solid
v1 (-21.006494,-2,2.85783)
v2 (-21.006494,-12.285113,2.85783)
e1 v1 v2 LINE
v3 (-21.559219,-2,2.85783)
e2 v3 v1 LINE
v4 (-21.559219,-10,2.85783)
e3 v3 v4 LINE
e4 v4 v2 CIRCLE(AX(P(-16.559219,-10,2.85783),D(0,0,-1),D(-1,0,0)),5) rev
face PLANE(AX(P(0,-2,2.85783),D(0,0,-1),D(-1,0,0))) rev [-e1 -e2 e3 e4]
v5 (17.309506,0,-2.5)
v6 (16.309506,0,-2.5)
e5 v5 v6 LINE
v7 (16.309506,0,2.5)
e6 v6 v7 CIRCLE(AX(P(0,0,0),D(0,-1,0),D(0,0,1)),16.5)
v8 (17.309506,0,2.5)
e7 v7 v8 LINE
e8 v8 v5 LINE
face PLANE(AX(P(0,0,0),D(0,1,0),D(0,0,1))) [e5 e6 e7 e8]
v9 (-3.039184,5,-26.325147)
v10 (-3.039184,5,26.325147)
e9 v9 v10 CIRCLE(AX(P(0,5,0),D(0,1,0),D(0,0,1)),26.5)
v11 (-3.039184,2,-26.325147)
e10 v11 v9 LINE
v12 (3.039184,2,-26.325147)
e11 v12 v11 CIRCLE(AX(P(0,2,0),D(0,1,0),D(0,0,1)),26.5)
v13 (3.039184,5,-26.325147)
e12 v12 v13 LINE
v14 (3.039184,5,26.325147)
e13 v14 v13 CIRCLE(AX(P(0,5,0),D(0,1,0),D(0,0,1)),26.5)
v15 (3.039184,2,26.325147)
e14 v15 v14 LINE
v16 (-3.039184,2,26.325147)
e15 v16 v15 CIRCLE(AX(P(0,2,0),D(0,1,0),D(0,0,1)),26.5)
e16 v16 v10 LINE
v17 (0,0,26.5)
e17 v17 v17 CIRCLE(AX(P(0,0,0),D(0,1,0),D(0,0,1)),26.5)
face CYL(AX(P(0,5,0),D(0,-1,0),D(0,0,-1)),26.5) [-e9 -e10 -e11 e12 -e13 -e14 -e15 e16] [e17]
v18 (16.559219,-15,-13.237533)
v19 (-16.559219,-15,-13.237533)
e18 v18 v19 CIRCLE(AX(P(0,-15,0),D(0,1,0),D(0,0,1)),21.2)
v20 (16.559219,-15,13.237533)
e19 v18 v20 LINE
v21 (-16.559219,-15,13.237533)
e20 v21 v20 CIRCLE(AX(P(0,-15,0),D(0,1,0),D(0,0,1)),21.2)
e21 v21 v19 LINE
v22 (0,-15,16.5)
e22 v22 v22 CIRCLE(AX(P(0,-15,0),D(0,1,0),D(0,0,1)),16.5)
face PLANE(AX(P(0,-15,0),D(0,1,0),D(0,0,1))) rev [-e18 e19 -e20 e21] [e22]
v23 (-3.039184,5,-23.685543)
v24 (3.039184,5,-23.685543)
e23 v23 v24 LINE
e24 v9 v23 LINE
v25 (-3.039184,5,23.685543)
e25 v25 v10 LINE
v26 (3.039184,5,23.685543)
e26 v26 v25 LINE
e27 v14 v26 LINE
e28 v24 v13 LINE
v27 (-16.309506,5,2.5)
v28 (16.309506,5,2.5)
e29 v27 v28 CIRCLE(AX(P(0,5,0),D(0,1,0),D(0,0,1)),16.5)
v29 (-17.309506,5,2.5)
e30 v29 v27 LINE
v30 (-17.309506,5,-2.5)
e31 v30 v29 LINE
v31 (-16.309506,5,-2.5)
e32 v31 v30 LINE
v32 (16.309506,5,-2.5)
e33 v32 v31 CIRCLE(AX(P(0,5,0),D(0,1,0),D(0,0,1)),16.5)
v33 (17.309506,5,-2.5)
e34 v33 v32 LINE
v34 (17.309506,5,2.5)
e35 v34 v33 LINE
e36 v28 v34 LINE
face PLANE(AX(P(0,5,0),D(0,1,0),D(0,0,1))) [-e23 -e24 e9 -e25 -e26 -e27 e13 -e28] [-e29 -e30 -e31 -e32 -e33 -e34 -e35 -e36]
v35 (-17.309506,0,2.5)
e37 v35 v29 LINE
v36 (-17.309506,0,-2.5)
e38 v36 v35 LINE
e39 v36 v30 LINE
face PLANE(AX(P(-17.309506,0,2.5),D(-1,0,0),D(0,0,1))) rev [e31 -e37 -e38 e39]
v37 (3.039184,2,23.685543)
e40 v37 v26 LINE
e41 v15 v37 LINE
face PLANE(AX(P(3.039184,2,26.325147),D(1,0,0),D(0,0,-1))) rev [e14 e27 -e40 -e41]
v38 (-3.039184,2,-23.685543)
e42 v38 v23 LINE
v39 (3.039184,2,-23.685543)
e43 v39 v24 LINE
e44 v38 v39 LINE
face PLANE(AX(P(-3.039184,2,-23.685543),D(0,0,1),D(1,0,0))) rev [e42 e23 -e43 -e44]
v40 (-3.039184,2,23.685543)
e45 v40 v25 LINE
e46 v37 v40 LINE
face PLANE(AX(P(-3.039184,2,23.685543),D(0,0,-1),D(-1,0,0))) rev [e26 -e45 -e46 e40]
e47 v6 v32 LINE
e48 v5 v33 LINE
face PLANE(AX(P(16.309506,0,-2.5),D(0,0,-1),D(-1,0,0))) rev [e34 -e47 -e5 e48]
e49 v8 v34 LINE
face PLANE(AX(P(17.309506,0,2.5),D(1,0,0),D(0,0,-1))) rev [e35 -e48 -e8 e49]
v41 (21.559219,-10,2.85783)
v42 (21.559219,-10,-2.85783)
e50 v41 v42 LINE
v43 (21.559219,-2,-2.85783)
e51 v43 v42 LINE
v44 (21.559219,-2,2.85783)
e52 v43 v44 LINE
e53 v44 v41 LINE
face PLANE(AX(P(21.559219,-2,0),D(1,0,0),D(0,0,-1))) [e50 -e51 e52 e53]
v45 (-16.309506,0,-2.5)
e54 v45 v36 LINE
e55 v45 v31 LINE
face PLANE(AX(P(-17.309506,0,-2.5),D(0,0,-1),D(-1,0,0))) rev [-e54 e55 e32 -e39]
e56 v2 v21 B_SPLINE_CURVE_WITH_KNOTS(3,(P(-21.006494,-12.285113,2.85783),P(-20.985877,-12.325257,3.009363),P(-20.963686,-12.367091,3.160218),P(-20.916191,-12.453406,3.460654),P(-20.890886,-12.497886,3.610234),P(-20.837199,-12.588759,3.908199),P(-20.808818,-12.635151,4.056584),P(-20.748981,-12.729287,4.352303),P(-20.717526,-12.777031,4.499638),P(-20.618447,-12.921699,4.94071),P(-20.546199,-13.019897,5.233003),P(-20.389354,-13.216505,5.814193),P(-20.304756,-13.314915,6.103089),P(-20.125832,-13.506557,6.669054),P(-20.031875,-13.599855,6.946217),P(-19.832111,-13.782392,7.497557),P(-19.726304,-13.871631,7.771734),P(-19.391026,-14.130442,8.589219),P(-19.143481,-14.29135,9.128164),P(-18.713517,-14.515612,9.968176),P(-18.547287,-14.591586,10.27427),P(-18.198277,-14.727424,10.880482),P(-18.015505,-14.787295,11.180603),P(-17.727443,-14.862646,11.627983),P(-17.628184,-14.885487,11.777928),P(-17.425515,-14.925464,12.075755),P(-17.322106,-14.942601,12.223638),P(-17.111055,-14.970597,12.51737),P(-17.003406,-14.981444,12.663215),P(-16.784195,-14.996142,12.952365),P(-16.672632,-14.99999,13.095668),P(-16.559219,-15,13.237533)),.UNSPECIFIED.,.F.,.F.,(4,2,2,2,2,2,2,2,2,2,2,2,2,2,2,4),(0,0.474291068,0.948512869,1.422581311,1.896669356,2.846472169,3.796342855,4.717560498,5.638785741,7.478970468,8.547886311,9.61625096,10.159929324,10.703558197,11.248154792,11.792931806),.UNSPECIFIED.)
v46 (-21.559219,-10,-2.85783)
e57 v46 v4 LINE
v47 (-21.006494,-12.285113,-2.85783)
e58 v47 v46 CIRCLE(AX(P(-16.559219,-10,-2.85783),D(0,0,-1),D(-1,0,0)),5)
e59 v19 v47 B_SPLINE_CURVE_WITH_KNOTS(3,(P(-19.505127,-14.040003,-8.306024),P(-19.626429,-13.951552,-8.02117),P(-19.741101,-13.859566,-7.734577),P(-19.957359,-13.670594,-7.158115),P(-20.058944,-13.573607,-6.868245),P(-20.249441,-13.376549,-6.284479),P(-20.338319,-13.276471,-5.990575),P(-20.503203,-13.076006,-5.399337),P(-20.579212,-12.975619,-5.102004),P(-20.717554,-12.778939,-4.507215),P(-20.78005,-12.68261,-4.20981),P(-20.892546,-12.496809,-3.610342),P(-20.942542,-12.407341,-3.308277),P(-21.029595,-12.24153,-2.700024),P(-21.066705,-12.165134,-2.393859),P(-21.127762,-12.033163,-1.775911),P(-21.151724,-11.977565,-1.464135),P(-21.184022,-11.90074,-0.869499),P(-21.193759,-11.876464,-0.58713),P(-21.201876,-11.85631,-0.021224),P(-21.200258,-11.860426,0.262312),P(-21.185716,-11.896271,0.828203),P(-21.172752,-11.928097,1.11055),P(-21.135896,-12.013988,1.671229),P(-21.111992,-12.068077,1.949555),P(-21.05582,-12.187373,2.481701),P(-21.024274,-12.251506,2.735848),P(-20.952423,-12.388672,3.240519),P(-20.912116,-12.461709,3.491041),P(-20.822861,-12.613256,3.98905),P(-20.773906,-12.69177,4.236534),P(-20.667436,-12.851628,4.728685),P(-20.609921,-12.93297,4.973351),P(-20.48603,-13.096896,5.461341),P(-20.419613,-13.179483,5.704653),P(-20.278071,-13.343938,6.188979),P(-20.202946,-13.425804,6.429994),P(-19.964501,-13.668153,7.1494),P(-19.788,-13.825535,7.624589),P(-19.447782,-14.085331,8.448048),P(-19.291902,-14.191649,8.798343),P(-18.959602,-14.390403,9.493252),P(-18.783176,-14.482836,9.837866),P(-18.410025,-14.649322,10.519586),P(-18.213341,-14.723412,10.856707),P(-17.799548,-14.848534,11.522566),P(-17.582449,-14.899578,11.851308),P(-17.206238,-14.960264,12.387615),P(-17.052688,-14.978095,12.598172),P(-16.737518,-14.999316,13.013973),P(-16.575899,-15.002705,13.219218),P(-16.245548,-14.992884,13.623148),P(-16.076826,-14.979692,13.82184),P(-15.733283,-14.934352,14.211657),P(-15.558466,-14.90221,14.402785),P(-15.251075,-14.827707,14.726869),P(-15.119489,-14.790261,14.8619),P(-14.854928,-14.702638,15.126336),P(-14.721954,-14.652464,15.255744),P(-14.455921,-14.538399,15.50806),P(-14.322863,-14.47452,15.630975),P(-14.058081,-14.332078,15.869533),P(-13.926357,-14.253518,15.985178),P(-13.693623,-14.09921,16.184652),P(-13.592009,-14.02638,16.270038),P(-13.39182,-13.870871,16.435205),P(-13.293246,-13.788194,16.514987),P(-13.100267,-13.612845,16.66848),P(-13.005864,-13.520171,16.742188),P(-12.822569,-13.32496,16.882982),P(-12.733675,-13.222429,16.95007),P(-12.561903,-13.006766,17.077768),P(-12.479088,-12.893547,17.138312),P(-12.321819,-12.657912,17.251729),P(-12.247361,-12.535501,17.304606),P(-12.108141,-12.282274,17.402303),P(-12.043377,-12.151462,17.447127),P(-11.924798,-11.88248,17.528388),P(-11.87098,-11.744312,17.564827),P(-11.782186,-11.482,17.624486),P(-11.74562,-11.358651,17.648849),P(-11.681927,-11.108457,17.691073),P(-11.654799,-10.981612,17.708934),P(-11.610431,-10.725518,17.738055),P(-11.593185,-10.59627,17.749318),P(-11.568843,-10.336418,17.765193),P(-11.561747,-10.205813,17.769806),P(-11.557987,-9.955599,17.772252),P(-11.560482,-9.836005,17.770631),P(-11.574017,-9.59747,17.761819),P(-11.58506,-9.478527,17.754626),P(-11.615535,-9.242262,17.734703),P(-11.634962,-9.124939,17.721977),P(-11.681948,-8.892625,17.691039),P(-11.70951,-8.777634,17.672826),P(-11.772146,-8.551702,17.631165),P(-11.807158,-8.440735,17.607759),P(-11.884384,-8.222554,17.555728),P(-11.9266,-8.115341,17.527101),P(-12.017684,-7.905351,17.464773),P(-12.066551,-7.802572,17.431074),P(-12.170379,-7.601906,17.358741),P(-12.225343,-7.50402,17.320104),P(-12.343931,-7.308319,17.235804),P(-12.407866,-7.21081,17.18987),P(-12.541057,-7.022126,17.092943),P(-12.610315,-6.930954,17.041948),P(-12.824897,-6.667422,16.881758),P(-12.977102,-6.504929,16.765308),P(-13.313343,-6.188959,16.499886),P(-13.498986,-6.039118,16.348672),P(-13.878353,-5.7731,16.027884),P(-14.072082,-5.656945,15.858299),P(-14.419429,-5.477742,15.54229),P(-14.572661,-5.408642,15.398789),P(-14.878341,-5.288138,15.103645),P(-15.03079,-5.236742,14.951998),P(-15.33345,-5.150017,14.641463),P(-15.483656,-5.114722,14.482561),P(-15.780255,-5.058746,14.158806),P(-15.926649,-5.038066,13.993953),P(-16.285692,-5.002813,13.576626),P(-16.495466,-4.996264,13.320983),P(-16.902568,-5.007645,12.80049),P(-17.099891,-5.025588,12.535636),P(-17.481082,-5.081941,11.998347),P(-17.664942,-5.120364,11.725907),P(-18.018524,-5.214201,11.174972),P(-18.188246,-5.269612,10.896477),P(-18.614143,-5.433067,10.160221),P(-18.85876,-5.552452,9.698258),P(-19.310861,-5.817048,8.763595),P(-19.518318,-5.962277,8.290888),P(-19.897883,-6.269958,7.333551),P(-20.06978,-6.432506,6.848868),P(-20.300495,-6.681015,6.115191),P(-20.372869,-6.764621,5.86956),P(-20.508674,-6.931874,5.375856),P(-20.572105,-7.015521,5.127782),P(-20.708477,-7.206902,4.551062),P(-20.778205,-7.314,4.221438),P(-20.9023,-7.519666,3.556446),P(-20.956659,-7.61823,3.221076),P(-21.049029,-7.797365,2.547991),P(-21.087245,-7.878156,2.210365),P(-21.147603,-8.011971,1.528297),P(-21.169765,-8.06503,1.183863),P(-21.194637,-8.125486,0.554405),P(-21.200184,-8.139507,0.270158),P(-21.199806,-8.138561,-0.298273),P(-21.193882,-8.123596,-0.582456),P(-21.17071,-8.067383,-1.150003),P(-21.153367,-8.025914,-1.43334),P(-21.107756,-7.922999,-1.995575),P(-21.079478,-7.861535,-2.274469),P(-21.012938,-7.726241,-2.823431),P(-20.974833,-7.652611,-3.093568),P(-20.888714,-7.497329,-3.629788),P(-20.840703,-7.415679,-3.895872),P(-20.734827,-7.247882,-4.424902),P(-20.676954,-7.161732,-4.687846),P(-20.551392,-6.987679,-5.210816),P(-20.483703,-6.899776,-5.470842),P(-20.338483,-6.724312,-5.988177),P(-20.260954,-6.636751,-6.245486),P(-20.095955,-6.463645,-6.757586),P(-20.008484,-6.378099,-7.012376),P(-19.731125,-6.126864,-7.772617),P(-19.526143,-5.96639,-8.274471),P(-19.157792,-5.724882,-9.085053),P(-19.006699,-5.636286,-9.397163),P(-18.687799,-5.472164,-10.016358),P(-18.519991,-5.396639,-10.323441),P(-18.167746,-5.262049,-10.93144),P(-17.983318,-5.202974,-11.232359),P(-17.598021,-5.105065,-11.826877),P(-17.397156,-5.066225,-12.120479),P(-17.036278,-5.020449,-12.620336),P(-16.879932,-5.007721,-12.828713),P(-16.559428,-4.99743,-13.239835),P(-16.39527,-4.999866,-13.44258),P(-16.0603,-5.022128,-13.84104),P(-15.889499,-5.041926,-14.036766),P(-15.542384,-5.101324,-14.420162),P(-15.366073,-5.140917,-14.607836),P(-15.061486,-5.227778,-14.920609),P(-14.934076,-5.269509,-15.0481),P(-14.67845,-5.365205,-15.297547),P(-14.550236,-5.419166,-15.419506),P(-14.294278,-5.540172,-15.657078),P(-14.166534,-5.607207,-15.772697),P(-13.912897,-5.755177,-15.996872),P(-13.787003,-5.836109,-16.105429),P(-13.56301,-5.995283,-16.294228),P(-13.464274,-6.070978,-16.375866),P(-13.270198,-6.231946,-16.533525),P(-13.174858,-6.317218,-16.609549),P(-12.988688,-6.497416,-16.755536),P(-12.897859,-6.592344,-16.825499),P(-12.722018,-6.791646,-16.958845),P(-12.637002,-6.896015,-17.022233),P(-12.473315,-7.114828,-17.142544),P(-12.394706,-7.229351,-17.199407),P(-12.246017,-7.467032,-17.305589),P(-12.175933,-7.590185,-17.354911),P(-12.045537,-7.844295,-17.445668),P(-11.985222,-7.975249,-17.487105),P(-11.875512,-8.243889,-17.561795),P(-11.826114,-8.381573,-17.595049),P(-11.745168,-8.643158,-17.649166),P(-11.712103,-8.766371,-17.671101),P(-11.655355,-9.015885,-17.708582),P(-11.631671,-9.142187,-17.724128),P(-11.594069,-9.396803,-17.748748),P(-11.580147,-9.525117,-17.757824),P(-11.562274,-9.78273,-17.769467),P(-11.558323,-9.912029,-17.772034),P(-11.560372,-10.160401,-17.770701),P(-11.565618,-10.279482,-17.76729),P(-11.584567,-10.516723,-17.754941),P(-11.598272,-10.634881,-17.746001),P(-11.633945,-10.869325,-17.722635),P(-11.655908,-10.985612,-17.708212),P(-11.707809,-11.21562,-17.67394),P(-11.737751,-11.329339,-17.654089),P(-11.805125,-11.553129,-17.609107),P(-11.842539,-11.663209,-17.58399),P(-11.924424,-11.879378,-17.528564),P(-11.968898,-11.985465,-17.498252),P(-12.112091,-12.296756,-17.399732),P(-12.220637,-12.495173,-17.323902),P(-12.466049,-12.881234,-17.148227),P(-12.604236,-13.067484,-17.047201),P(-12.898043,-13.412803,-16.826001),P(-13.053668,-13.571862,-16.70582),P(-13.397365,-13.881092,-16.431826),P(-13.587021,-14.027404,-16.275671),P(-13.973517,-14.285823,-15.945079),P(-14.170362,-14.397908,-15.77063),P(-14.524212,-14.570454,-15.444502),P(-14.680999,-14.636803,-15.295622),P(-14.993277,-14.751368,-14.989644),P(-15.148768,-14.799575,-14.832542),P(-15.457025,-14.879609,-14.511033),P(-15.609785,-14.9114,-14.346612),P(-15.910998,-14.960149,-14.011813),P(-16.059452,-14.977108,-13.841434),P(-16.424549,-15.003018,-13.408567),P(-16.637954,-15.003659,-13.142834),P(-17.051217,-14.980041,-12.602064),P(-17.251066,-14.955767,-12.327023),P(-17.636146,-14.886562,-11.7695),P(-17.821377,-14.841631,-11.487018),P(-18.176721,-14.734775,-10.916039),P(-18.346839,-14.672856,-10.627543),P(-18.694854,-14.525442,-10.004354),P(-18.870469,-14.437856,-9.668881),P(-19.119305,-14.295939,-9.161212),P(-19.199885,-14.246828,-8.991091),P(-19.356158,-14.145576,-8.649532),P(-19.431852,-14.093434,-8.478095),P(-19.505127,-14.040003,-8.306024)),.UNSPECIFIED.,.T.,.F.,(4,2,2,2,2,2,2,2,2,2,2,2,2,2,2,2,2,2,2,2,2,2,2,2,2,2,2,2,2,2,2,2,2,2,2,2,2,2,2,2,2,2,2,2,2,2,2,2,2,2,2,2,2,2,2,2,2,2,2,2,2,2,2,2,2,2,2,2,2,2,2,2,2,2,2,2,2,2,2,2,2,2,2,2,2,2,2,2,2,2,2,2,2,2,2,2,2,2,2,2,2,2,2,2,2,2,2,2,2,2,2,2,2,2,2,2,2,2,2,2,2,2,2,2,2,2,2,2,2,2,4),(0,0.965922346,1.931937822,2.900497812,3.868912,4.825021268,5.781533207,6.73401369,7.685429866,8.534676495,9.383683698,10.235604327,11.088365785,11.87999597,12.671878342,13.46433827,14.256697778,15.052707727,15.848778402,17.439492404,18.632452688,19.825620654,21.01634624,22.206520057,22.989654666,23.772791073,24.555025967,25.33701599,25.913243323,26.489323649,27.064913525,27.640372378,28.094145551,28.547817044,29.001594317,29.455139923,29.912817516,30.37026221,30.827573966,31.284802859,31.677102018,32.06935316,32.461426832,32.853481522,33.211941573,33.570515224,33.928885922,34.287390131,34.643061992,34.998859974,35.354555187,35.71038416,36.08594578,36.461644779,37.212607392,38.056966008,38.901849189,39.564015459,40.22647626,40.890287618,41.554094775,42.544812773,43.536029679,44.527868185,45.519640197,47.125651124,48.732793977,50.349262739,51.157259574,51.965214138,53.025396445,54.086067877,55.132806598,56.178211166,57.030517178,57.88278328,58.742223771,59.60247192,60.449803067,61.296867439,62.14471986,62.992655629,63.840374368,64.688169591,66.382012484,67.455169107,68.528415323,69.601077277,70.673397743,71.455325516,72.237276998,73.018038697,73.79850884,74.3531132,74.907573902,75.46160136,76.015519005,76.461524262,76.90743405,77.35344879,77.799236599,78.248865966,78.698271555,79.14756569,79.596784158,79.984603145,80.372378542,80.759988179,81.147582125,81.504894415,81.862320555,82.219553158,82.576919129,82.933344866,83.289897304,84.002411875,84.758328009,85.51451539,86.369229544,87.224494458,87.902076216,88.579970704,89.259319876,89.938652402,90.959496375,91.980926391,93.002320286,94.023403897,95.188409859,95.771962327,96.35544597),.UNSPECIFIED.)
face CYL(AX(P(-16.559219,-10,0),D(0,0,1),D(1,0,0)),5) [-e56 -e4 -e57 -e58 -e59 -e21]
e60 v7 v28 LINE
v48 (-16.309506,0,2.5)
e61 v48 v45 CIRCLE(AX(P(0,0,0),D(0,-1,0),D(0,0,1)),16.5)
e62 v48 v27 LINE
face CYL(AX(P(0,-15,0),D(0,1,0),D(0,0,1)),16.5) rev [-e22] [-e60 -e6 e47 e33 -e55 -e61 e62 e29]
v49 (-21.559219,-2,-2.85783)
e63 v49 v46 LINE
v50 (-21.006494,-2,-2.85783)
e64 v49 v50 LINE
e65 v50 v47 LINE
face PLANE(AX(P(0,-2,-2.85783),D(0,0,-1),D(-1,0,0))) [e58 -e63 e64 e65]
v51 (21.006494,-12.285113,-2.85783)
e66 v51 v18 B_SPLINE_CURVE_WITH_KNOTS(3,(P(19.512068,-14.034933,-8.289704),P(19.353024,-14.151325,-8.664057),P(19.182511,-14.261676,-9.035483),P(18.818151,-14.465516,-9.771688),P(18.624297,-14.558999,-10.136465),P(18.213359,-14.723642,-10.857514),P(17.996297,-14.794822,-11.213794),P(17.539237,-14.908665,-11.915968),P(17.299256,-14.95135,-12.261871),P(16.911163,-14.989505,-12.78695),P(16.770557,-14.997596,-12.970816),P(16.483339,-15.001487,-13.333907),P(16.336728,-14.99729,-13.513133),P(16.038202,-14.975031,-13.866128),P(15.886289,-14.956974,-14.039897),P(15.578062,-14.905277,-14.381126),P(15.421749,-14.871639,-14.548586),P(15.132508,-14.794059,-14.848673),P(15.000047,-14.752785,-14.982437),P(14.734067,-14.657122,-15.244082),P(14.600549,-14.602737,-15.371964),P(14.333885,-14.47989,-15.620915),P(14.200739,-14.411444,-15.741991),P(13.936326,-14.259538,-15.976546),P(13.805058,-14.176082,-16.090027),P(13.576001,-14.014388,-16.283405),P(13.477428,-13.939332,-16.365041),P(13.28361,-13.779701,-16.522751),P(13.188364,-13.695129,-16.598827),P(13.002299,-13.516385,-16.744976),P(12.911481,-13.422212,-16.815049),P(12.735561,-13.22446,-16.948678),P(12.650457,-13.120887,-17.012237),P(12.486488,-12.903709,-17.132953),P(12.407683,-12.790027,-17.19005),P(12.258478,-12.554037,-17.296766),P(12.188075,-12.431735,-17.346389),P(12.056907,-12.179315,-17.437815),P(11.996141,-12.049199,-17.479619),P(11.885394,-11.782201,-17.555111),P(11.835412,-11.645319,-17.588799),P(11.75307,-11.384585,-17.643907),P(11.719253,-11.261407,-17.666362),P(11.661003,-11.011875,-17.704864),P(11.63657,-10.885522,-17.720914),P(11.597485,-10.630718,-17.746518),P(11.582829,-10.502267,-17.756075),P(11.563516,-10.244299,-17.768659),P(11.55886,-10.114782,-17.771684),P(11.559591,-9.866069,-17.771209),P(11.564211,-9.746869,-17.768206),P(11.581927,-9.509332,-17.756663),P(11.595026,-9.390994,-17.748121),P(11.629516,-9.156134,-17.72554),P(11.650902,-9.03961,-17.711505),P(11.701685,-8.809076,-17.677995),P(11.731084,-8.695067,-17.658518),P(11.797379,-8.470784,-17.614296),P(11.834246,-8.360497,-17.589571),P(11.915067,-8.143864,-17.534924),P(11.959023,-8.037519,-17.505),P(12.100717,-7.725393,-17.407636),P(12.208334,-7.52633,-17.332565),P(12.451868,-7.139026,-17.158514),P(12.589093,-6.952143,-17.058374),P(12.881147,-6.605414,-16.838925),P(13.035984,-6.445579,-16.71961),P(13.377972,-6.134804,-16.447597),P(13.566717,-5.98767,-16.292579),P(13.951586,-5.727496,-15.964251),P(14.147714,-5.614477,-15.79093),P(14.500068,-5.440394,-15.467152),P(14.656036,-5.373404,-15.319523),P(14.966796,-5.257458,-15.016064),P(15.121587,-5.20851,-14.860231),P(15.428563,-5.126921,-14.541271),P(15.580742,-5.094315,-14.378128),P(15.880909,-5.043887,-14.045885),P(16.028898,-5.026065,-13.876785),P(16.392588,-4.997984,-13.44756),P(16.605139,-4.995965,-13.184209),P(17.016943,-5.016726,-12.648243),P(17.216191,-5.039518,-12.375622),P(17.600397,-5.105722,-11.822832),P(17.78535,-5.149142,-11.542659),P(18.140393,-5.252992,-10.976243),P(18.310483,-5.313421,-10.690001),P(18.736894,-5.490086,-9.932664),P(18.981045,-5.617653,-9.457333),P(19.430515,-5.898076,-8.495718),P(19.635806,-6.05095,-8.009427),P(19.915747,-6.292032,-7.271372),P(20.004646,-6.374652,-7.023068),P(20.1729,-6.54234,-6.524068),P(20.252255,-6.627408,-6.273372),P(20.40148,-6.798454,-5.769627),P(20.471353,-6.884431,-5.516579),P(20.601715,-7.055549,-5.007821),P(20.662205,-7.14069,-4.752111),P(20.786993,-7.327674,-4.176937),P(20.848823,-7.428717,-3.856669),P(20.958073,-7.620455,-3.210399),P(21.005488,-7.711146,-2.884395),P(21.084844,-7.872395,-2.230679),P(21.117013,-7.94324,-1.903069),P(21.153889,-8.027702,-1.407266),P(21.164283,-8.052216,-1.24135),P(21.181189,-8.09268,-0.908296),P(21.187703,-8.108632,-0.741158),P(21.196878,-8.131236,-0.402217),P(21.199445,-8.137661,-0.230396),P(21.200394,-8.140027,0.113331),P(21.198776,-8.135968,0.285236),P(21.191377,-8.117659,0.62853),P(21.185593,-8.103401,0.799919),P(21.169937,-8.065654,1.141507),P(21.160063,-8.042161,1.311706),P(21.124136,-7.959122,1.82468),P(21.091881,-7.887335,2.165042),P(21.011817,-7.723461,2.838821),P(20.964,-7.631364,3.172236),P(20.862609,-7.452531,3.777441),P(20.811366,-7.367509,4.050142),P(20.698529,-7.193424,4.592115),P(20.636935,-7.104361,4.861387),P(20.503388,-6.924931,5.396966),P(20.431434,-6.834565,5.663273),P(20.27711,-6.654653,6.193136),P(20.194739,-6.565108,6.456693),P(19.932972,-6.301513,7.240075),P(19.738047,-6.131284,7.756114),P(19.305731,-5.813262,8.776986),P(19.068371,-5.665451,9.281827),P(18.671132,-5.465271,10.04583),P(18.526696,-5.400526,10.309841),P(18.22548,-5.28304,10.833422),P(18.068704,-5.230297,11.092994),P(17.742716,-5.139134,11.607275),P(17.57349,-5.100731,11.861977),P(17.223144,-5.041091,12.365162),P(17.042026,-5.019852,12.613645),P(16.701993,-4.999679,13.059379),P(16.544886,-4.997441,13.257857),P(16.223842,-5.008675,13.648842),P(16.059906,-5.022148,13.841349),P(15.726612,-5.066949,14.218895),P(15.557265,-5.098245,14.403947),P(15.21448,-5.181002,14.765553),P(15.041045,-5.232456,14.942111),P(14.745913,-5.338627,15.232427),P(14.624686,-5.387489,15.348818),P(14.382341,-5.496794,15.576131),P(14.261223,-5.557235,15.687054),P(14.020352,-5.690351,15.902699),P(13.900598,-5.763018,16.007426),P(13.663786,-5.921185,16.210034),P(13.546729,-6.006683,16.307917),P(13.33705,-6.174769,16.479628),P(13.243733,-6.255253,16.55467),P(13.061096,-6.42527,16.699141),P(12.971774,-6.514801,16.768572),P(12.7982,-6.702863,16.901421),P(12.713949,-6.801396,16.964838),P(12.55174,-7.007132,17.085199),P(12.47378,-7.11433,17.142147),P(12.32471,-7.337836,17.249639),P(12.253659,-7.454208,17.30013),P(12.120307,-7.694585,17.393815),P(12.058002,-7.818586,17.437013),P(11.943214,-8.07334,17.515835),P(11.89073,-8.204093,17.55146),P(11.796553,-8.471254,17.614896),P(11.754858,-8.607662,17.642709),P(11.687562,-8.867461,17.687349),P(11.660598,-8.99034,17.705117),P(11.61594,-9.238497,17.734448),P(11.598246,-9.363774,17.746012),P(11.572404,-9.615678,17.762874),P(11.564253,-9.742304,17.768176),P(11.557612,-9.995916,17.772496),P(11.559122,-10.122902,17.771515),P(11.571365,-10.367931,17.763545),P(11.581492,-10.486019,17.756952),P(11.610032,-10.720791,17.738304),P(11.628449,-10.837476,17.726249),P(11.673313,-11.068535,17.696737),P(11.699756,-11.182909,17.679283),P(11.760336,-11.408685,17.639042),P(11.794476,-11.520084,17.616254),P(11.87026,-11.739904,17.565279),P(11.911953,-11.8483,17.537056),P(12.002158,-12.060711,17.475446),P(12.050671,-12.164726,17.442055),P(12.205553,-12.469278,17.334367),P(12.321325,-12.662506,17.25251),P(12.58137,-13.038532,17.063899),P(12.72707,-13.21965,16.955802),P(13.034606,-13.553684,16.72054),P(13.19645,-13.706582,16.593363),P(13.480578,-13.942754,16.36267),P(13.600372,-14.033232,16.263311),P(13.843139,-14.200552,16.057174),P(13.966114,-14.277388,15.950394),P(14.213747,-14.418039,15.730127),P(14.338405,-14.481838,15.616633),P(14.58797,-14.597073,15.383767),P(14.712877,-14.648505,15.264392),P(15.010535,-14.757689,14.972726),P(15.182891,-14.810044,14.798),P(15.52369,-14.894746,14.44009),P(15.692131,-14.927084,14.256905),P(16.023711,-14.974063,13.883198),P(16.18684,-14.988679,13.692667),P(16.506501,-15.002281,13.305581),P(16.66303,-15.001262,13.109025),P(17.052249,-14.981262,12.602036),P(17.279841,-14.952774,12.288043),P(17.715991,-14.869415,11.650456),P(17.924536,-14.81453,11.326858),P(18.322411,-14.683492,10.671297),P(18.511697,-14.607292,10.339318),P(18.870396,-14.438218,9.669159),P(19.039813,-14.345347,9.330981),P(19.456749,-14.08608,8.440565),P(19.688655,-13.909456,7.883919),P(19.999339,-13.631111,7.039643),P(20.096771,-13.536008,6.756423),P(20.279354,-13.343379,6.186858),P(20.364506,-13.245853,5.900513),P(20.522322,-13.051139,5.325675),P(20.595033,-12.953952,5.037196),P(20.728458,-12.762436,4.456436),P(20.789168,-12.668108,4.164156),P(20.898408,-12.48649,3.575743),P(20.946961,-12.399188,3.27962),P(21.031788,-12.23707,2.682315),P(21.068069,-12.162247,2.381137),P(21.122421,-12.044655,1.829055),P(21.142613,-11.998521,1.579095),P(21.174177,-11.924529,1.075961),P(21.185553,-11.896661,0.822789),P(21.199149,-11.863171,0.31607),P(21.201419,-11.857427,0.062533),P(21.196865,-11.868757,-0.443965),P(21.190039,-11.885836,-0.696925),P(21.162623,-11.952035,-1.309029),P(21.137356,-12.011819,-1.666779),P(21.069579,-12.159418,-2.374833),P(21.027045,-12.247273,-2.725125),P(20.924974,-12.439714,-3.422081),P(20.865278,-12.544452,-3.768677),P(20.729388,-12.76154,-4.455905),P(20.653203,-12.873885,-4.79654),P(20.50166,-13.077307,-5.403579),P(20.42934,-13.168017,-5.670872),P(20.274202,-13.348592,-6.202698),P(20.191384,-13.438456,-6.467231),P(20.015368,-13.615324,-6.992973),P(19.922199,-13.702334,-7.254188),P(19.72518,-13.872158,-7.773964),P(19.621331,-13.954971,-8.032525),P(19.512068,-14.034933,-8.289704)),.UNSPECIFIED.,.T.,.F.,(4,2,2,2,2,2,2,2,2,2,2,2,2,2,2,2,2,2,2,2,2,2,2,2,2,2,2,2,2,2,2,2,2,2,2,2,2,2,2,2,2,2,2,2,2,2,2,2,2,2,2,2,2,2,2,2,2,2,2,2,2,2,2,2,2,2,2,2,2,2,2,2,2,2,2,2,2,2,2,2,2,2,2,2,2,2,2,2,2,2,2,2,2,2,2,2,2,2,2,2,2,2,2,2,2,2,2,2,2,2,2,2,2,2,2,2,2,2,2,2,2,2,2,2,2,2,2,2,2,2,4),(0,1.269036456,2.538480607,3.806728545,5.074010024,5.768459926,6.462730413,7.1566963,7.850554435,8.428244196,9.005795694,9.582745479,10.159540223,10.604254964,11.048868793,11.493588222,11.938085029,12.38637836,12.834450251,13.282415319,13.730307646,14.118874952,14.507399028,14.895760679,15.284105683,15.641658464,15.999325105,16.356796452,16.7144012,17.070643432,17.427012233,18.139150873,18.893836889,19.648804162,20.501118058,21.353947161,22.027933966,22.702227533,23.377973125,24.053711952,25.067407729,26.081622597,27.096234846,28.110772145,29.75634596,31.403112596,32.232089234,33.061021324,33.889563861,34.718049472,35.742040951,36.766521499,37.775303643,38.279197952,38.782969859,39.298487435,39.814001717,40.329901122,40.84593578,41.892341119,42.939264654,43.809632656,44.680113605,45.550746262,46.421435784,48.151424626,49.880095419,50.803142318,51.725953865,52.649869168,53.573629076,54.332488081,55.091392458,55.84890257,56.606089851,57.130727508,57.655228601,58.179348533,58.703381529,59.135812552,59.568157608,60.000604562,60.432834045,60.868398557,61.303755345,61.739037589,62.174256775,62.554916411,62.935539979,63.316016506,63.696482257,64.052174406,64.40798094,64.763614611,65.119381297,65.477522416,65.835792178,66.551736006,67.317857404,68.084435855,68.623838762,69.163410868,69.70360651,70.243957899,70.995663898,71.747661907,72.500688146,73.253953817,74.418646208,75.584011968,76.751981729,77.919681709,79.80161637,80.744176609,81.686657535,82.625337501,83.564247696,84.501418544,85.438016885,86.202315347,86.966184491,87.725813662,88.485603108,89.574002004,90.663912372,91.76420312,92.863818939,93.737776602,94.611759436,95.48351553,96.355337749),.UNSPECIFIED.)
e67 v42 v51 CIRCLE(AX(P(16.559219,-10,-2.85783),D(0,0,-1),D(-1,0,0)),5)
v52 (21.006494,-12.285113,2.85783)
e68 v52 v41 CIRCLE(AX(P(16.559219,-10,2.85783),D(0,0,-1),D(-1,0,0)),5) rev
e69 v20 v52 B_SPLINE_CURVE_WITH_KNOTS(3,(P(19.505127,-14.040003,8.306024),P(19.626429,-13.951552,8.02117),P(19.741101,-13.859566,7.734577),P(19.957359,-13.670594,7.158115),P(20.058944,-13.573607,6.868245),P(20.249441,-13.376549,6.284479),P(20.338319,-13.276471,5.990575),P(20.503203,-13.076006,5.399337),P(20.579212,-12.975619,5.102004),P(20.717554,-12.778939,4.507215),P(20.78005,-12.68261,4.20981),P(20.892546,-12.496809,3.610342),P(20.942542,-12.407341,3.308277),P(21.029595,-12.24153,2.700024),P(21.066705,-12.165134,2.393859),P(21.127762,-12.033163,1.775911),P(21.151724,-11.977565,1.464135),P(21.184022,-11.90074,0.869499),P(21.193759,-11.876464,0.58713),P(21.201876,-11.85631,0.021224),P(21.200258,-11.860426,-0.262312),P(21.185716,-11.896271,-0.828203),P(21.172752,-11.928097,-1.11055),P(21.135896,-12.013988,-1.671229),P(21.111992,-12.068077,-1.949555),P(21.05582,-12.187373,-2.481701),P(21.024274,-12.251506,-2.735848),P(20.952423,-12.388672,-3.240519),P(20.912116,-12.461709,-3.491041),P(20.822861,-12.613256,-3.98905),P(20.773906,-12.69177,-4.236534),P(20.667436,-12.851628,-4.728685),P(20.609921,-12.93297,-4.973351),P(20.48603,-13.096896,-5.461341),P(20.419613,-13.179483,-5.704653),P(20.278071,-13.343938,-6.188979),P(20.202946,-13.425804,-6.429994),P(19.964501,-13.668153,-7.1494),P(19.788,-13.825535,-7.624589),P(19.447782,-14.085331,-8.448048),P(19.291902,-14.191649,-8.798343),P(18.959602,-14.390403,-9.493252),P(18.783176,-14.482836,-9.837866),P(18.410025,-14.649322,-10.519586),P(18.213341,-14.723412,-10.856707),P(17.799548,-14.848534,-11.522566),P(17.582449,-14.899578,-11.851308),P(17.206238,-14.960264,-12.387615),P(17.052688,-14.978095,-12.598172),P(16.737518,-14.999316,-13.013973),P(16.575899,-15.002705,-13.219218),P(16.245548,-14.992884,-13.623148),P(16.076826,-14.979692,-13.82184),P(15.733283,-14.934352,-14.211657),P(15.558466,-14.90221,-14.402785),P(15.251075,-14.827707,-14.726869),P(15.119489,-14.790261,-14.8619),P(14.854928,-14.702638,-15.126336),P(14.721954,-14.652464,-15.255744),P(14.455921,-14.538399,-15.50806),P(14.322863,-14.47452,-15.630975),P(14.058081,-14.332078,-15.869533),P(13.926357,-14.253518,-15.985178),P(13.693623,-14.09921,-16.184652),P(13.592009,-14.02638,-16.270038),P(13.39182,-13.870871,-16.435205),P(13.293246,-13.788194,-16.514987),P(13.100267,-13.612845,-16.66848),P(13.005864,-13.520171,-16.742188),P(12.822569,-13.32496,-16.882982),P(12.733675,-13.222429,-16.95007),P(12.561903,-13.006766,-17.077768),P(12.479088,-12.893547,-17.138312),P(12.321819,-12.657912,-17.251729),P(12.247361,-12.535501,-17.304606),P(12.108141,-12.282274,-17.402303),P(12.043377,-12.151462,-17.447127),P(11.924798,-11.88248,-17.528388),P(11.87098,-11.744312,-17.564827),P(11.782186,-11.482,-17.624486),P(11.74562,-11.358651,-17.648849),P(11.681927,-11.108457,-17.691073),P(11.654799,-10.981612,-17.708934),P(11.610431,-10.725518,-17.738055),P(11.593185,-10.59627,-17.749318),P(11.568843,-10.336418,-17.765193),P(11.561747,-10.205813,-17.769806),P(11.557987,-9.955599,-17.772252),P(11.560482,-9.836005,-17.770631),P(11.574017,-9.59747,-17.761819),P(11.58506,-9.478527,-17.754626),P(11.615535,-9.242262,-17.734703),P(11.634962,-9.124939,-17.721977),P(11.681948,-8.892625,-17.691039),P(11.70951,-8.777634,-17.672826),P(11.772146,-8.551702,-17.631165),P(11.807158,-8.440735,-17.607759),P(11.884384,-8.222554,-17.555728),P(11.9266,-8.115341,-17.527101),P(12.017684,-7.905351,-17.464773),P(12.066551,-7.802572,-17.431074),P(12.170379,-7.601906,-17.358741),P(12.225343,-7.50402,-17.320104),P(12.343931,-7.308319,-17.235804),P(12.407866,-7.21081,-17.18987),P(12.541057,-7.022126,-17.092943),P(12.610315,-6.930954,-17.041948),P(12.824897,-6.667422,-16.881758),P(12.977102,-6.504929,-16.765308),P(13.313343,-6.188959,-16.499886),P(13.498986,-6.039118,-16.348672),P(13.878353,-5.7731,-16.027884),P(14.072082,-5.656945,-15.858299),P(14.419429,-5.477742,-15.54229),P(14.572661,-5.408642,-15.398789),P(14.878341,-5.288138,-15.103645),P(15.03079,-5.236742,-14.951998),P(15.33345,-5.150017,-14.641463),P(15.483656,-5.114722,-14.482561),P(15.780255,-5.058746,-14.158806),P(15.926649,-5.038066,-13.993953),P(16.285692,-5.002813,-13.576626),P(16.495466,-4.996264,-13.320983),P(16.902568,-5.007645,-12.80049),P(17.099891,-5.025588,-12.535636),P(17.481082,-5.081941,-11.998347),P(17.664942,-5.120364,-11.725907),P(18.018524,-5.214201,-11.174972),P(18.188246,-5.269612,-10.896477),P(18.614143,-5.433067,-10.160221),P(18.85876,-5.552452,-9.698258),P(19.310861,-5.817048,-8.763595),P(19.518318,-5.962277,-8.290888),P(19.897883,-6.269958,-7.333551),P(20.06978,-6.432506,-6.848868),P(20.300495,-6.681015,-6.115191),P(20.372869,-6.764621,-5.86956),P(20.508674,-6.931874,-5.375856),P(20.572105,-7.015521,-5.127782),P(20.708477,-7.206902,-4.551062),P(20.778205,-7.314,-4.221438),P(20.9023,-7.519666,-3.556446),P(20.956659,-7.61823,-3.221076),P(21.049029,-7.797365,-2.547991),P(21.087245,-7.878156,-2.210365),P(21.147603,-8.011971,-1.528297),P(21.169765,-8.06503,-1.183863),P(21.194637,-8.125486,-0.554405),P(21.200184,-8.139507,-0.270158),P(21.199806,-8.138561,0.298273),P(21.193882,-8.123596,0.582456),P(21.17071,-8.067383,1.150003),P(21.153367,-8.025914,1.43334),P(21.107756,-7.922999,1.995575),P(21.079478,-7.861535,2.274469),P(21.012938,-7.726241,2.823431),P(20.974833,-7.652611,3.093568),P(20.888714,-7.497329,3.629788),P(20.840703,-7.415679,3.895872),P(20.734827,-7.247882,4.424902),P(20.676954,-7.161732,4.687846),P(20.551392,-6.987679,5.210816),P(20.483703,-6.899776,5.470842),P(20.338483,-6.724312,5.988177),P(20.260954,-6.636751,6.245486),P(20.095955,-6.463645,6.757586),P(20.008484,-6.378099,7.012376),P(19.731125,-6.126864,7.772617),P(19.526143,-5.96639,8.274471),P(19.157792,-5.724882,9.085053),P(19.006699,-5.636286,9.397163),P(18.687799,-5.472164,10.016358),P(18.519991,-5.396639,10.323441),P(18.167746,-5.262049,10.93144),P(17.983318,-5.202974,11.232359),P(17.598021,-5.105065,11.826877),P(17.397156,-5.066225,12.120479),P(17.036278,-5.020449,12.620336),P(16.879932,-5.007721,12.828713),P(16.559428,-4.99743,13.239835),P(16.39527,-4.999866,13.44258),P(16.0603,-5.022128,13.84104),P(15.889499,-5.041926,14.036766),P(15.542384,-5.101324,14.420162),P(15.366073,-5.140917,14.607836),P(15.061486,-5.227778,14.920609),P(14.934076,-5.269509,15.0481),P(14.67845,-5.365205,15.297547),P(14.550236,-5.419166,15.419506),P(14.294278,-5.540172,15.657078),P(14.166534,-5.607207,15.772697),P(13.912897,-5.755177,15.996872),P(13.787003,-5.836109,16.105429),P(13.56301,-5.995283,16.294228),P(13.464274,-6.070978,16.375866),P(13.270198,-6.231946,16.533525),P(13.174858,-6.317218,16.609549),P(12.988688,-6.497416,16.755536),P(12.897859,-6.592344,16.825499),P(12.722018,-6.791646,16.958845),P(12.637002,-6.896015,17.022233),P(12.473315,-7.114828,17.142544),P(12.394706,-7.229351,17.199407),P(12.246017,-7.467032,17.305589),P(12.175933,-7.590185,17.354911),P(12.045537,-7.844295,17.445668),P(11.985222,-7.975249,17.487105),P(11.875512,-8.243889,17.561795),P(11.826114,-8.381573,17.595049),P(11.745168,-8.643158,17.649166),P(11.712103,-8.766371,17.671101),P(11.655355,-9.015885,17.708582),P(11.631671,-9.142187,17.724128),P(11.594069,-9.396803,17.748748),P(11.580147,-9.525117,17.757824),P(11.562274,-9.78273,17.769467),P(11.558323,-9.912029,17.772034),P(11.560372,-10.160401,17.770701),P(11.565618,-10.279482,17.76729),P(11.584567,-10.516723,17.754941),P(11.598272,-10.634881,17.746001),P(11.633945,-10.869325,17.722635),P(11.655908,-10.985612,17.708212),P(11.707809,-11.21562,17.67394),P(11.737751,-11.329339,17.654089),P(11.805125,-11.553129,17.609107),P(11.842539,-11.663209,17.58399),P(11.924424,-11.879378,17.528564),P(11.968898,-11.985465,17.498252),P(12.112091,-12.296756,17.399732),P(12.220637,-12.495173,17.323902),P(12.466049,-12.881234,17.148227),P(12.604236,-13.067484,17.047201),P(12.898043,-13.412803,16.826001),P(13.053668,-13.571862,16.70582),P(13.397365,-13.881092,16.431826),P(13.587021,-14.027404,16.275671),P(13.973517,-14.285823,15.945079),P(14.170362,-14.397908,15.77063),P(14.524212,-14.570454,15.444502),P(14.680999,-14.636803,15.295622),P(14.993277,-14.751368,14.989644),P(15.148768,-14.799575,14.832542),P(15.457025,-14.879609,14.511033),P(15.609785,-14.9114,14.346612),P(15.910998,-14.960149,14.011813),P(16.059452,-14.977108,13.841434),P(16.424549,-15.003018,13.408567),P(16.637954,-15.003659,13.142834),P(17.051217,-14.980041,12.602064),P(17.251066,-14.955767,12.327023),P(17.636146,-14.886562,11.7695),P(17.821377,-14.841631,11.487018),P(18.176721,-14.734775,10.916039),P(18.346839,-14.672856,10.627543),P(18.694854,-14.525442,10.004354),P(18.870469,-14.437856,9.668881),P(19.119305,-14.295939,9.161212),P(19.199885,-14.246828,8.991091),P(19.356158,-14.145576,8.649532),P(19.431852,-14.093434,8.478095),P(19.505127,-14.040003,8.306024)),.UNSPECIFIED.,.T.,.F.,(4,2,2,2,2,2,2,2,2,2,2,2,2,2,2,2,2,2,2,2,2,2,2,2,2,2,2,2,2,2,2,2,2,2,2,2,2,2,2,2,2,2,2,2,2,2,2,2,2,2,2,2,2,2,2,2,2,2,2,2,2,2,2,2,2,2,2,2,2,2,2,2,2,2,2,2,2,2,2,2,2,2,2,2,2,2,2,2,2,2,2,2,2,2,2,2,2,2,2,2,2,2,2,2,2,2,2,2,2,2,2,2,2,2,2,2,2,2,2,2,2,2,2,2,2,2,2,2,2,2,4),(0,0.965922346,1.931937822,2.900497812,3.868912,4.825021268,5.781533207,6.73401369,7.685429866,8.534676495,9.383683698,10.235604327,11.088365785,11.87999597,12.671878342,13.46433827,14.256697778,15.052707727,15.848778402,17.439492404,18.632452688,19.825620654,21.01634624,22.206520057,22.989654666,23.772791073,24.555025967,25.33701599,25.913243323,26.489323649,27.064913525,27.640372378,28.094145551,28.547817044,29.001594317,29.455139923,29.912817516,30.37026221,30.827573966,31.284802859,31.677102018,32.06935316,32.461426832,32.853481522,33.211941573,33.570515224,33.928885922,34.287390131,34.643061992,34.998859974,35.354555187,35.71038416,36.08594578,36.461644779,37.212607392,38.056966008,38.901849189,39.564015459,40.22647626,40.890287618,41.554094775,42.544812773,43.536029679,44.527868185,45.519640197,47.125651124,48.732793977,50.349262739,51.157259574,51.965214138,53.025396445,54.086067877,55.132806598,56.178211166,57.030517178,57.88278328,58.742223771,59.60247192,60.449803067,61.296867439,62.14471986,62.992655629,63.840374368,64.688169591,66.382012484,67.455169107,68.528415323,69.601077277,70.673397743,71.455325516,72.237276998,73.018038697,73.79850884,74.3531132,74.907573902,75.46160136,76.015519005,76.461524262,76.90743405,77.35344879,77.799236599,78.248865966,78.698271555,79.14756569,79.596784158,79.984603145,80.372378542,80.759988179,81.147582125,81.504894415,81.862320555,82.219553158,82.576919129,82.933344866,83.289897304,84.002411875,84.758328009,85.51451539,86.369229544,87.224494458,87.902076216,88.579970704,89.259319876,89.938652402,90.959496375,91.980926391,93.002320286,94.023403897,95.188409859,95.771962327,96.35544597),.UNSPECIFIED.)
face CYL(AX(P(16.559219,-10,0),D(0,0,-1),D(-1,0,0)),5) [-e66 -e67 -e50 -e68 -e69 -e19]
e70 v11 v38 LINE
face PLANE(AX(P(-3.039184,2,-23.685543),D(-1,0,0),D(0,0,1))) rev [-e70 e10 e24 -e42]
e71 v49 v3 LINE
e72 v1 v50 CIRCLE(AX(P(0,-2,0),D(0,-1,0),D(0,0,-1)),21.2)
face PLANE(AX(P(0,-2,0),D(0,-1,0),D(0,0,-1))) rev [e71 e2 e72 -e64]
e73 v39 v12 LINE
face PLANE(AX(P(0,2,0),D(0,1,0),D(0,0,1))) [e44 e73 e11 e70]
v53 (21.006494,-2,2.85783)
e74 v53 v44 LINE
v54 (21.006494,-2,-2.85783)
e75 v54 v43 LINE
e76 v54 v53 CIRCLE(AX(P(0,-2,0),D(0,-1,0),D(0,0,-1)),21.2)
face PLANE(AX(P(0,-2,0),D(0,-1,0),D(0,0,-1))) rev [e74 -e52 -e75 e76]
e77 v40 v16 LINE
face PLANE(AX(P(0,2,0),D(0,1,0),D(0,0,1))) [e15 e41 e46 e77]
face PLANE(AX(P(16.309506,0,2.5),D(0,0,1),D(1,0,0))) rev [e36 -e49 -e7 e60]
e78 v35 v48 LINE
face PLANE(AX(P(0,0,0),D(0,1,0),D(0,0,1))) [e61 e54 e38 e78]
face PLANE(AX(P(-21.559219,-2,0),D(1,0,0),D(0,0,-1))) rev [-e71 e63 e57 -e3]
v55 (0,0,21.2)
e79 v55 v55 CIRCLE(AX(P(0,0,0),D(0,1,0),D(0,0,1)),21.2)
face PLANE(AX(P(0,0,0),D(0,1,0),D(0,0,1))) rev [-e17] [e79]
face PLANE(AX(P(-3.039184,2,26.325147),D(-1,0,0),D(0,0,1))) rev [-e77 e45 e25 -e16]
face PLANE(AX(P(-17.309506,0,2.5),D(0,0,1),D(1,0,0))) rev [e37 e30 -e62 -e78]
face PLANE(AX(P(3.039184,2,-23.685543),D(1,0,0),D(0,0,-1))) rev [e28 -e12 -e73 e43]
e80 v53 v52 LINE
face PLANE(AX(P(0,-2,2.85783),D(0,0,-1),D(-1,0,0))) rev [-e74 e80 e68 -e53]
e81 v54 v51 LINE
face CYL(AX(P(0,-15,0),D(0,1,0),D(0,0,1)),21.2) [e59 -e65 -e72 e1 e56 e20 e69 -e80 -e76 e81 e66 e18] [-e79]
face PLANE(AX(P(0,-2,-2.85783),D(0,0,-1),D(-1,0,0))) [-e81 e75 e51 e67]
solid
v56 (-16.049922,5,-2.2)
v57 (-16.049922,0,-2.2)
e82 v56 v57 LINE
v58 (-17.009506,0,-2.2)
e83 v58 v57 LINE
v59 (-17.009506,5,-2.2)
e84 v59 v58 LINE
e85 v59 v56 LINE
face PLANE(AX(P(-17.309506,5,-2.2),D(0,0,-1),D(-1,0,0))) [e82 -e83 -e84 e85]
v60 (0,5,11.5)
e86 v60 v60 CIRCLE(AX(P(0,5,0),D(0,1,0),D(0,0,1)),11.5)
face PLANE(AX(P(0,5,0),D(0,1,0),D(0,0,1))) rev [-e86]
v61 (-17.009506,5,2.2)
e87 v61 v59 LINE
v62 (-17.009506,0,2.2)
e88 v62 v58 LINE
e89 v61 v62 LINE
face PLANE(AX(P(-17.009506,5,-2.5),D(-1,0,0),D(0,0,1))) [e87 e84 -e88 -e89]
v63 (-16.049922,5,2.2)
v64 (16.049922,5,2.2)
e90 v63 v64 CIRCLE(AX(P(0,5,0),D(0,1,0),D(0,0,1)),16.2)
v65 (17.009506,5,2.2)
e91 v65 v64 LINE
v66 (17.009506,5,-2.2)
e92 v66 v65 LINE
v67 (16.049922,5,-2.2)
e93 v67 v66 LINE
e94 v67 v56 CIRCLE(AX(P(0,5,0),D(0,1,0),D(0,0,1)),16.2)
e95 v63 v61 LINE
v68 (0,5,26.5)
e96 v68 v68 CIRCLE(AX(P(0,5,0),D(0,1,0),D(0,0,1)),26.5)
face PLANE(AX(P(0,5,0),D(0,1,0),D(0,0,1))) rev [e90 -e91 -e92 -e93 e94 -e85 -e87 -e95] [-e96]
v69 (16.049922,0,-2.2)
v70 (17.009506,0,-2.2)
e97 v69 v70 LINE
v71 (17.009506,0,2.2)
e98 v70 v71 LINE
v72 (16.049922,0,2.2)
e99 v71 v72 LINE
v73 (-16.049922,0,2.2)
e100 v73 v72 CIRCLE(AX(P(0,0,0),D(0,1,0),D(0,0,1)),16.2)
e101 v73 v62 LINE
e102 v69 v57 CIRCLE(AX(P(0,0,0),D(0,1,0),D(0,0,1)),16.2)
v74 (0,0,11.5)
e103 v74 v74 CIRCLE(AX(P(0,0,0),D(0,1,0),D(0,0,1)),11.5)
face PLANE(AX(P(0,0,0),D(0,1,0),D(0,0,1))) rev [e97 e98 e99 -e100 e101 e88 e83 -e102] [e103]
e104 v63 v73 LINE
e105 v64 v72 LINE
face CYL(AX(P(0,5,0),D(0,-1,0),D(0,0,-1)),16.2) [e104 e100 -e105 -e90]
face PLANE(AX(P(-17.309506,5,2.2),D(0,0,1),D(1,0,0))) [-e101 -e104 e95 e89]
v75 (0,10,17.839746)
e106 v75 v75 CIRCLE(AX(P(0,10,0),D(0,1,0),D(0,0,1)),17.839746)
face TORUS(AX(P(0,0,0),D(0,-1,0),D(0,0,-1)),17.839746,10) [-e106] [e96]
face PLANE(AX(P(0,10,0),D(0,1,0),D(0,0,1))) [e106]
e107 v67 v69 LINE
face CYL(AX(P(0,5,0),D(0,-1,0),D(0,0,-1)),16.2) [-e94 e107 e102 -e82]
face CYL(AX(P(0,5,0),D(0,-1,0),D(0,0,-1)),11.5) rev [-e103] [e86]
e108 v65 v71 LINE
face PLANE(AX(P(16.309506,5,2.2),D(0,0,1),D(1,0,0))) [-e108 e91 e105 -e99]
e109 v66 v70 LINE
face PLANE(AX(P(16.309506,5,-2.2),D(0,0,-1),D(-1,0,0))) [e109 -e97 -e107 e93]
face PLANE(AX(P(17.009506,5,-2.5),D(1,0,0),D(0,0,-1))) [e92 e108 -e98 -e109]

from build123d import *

# Parameters (mm, degrees)
SKETCH1_R           = 21.5
SKETCH1_R_2         = 16.5
BOSS_EXTRUDE2_DEPTH = 15
BOSS_EXTRUDE3_START = 5
SKETCH3_R           = 26.5
SKETCH3_R_2         = 16.5
BOSS_EXTRUDE3_DEPTH = 5
BOSS_EXTRUDE4_START = -13
BOSS_EXTRUDE4_DEPTH = 13
FILLET1_R           = 5
SKETCH7_R           = 16.5
SKETCH7_R_2         = 11.5
BOSS_EXTRUDE5_DEPTH = 5
SKETCH8_R           = 26.5
BOSS_EXTRUDE6_DEPTH = 5
FILLET2_R           = 10
CUT_EXTRUDE2_DEPTH  = 5
BOSS_EXTRUDE8_DEPTH = 5
CUT_EXTRUDE3_DEPTH  = 3
MOVE_START          = 4
MOVE_FACE1_DEPTH    = 6
MOVE_START_2        = -15
MOVE_FACE1_2_DEPTH  = 15
MOVE_START_3        = -2
MOVE_FACE1_3_DEPTH  = 2


with BuildPart() as part:
    # Sketch1 → Boss-Extrude2 (new body)
    with BuildSketch(Plane(origin=(0, 0, 0), x_dir=(1, 0, 0), z_dir=(0, 1, 0))):
        with Locations(Location((0, 0, 0), (0, 0, 270))):
            Circle(SKETCH1_R)
        with Locations(Location((0, 0, 0), (0, 0, 270))):
            Circle(SKETCH1_R_2, mode=Mode.SUBTRACT)
    extrude(amount=-BOSS_EXTRUDE2_DEPTH)

    # Sketch3 → Boss-Extrude3 (add)
    with BuildSketch(Plane(origin=(0, 0, 0), x_dir=(1, 0, 0), z_dir=(0, 1, 0)).offset(BOSS_EXTRUDE3_START)):
        with Locations(Location((0, 0, 0), (0, 0, 270))):
            Circle(SKETCH3_R)
        with Locations(Location((0, 0, 0), (0, 0, 270))):
            Circle(SKETCH3_R_2, mode=Mode.SUBTRACT)
    extrude(amount=-BOSS_EXTRUDE3_DEPTH)

    # Sketch5 → Boss-Extrude4 (add)
    with BuildSketch(Plane.XZ.offset(15).offset(BOSS_EXTRUDE4_START)):
        with BuildLine():
            Line((21.559218876, 2.857829749), (21.309218876, 2.857829749))
            ThreePointArc((21.309218876, 2.857829749), (21.452251698, 1.432095345), (21.5, 0))
            ThreePointArc((21.5, 0), (21.452251698, -1.432095345), (21.309218876, -2.857829749))
            Line((21.309218876, -2.857829749), (21.559218876, -2.857829749))
            Line((21.559218876, -2.857829749), (21.559218876, 2.857829749))
        make_face()
        with BuildLine():
            ThreePointArc((-21.309218876, -2.857829749), (-21.5, 0), (-21.309218876, 2.857829749))
            Line((-21.309218876, 2.857829749), (-21.559218876, 2.857829749))
            Line((-21.559218876, 2.857829749), (-21.559218876, -2.857829749))
            Line((-21.559218876, -2.857829749), (-21.309218876, -2.857829749))
        make_face()
    extrude(amount=BOSS_EXTRUDE4_DEPTH)

    # Fillet1
    fillet1_edges = [part.edges().sort_by_distance(p)[0] for p in [
        (-21.559218876, -15, 0),
        (21.559218876, -15, 0),
    ]]
    fillet(fillet1_edges, radius=FILLET1_R)

    # Sketch9 → Cut-Extrude2 (cut)
    with BuildSketch(Plane(origin=(0, 5, 0), x_dir=(1, 0, 0), z_dir=(0, 1, 0))):
        with BuildLine():
            Line((16.30950643, 2.5), (17.30950643, 2.5))
            Line((17.30950643, 2.5), (17.30950643, -2.5))
            Line((17.30950643, -2.5), (16.30950643, -2.5))
            ThreePointArc((16.30950643, -2.5), (16.5, 0), (16.30950643, 2.5))
        make_face()
        with BuildLine():
            Line((-17.30950643, -2.5), (-16.30950643, -2.5))
            ThreePointArc((-16.30950643, -2.5), (-16.5, 0), (-16.30950643, 2.5))
            Line((-16.30950643, 2.5), (-17.30950643, 2.5))
            Line((-17.30950643, 2.5), (-17.30950643, -2.5))
        make_face()
    extrude(amount=-CUT_EXTRUDE2_DEPTH, mode=Mode.SUBTRACT)

    # Sketch15 → Cut-Extrude3 (cut)
    with BuildSketch(Plane(origin=(0, 5, 0), x_dir=(1, 0, 0), z_dir=(0, 1, 0))):
        with BuildLine():
            Line((3.039184032, 23.685543065), (3.039184032, 26.325146921))
            ThreePointArc((3.039184032, 26.325146921), (0, 26.5), (-3.039184032, 26.325146921))
            Line((-3.039184032, 26.325146921), (-3.039184032, 23.685543065))
            Line((-3.039184032, 23.685543065), (3.039184032, 23.685543065))
        make_face()
        with BuildLine():
            Line((-3.039184032, -26.325146921), (-3.039184032, -23.685543065))
            Line((-3.039184032, -23.685543065), (3.039184032, -23.685543065))
            Line((3.039184032, -23.685543065), (3.039184032, -26.325146921))
            ThreePointArc((3.039184032, -26.325146921), (0, -26.5), (-3.039184032, -26.325146921))
        make_face()
    extrude(amount=-CUT_EXTRUDE3_DEPTH, mode=Mode.SUBTRACT)

    # Move Face1 2 outline → Move Face1 2 (cut)
    with BuildSketch(Plane(origin=(0, 0, 0), x_dir=(1, 0, 0), z_dir=(0, 1, 0)).offset(MOVE_START_2)):
        with BuildLine():
            ThreePointArc((-21.006494451, 2.857829749), (0, 21.2), (21.006494451, 2.857829749))
            Line((21.006494451, 2.857829749), (21.309218876, 2.857829749))
            ThreePointArc((21.309218876, 2.857829749), (0, 21.5), (-21.309218876, 2.857829749))
            Line((-21.309218876, 2.857829749), (-21.006494451, 2.857829749))
        make_face()
        with BuildLine():
            Line((21.309218876, -2.857829749), (21.006494451, -2.857829749))
            ThreePointArc((21.006494451, -2.857829749), (0, -21.2), (-21.006494451, -2.857829749))
            Line((-21.006494451, -2.857829749), (-21.309218876, -2.857829749))
            ThreePointArc((-21.309218876, -2.857829749), (0, -21.5), (21.309218876, -2.857829749))
        make_face()
    extrude(amount=MOVE_FACE1_2_DEPTH, mode=Mode.SUBTRACT)

    # Move Face1 3 outline → Move Face1 3 (cut)
    with BuildSketch(Plane(origin=(0, 0, 0), x_dir=(1, 0, 0), z_dir=(0, 1, 0)).offset(MOVE_START_3)):
        with BuildLine():
            ThreePointArc((21.006494451, 2.857829749), (21.2, 0), (21.006494451, -2.857829749))
            Line((21.006494451, -2.857829749), (21.309218876, -2.857829749))
            ThreePointArc((21.309218876, -2.857829749), (21.5, 0), (21.309218876, 2.857829749))
            Line((21.309218876, 2.857829749), (21.006494451, 2.857829749))
        make_face()
        with BuildLine():
            ThreePointArc((-21.006494451, -2.857829749), (-21.2, 0), (-21.006494451, 2.857829749))
            Line((-21.006494451, 2.857829749), (-21.309218876, 2.857829749))
            ThreePointArc((-21.309218876, 2.857829749), (-21.5, 0), (-21.309218876, -2.857829749))
            Line((-21.309218876, -2.857829749), (-21.006494451, -2.857829749))
        make_face()
    extrude(amount=MOVE_FACE1_3_DEPTH, mode=Mode.SUBTRACT)


with BuildPart() as body_2:
    # Sketch7 → Boss-Extrude5 (new body)
    with BuildSketch(Plane(origin=(0, 5, 0), x_dir=(1, 0, 0), z_dir=(0, 1, 0))):
        with Locations(Location((39.28088424, 30.935612703, 0), (0, 0, 270))):
            Circle(SKETCH7_R)
        with Locations(Location((39.28088424, 30.935612703, 0), (0, 0, 270))):
            Circle(SKETCH7_R_2, mode=Mode.SUBTRACT)
    extrude(amount=BOSS_EXTRUDE5_DEPTH)

    # Sketch8 → Boss-Extrude6 (add)
    with BuildSketch(Plane(origin=(0, 10, 0), x_dir=(1, 0, 0), z_dir=(0, 1, 0))):
        with Locations(Location((39.28088424, 30.935612703, 0), (0, 0, 270))):
            Circle(SKETCH8_R)
    extrude(amount=BOSS_EXTRUDE6_DEPTH)


with BuildPart() as body_2_1:
    # Body-Move/Copy1: moved
    add(body_2.part.moved(Location((-39.167227513, 0, 30.951860953))))


with BuildPart() as body_2_2:
    # Body-Move/Copy2: moved
    add(body_2_1.part.moved(Location((55, 0, 0))))

    # Fillet2
    # the kernel refuses this fillet: 10 mm, written as the material it takes off along each edge
    with BuildSketch(Plane(origin=(55.113656727, 15, 0.01624825), x_dir=(0, 0, 1), z_dir=(-1, 0, 0))) as fillet2_piece_1:
        with BuildLine():
            CenterArc((17.839745962, -10), FILLET2_R, 30, 60)
            Line((17.839745962, 0), (17.839745962, 0.2))
            Line((17.839745962, 0.2), (26.5, 0.2))
            Line((26.5, 0.2), (26.7, 0))
            ThreePointArc((26.7, 0), (26.7, -2.5), (26.673205081, -4.9))
            Line((26.673205081, -4.9), (26.5, -5))
        make_face()
    revolve(axis=Axis((55.113656727, 15, 0.01624825), (0, 1, 0)), mode=Mode.SUBTRACT)

    # Sketch10 → Boss-Extrude8 (add)
    with BuildSketch(Plane.XZ.offset(-5)):
        with BuildLine():
            Line((71.423163157, 2.51624825), (72.423163157, 2.51624825))
            Line((72.423163157, 2.51624825), (72.423163157, -2.48375175))
            Line((72.423163157, -2.48375175), (71.423163157, -2.48375175))
            ThreePointArc((71.423163157, -2.48375175), (71.613656727, 0.01624825), (71.423163157, 2.51624825))
        make_face()
        with BuildLine():
            Line((37.804150296, -2.48375175), (38.804150296, -2.48375175))
            ThreePointArc((38.804150296, -2.48375175), (38.613656727, 0.01624825), (38.804150296, 2.51624825))
            Line((38.804150296, 2.51624825), (37.804150296, 2.51624825))
            Line((37.804150296, 2.51624825), (37.804150296, -2.48375175))
        make_face()
    extrude(amount=-BOSS_EXTRUDE8_DEPTH)

    # Move Face1: read off the stored shape, not the designer's step
    # Move Face1 outline → Move Face1 (cut)
    with BuildSketch(Plane(origin=(0, 0, 0), x_dir=(1, 0, 0), z_dir=(0, 1, 0)).offset(MOVE_START)):
        with BuildLine():
            ThreePointArc((38.804150296, -2.51624825), (55.113656727, -16.51624825), (71.423163157, -2.51624825))
            Line((71.423163157, -2.51624825), (72.423163157, -2.51624825))
            Line((72.423163157, -2.51624825), (72.423163157, 2.48375175))
            Line((72.423163157, 2.48375175), (71.423163157, 2.48375175))
            ThreePointArc((71.423163157, 2.48375175), (55.113656727, 16.48375175), (38.804150296, 2.48375175))
            Line((38.804150296, 2.48375175), (37.804150296, 2.48375175))
            Line((37.804150296, 2.48375175), (37.804150296, -2.51624825))
            Line((37.804150296, -2.51624825), (38.804150296, -2.51624825))
        make_face()
        with BuildLine():
            Line((72.123163157, -2.21624825), (71.163578845, -2.21624825))
            ThreePointArc((71.163578845, -2.21624825), (55.113656726, -16.21624825), (39.063734608, -2.21624825))
            Line((39.063734608, -2.21624825), (38.104150296, -2.21624825))
            Line((38.104150296, -2.21624825), (38.104150296, 2.18375175))
            Line((38.104150296, 2.18375175), (39.063734608, 2.18375175))
            ThreePointArc((39.063734608, 2.18375175), (55.113656726, 16.18375175), (71.163578845, 2.18375175))
            Line((71.163578845, 2.18375175), (72.123163157, 2.18375175))
            Line((72.123163157, 2.18375175), (72.123163157, -2.21624825))
        make_face(mode=Mode.SUBTRACT)
    extrude(amount=MOVE_FACE1_DEPTH, mode=Mode.SUBTRACT)


with BuildPart() as body_2_3:
    # Body-Move/Copy3: read off the stored shape, not the designer's step
    # Body-Move/Copy3: moved
    add(body_2_2.part.moved(Location((-55.1136567, -5, -0.0162482))))


solid = Compound([part.part, body_2_3.part])
